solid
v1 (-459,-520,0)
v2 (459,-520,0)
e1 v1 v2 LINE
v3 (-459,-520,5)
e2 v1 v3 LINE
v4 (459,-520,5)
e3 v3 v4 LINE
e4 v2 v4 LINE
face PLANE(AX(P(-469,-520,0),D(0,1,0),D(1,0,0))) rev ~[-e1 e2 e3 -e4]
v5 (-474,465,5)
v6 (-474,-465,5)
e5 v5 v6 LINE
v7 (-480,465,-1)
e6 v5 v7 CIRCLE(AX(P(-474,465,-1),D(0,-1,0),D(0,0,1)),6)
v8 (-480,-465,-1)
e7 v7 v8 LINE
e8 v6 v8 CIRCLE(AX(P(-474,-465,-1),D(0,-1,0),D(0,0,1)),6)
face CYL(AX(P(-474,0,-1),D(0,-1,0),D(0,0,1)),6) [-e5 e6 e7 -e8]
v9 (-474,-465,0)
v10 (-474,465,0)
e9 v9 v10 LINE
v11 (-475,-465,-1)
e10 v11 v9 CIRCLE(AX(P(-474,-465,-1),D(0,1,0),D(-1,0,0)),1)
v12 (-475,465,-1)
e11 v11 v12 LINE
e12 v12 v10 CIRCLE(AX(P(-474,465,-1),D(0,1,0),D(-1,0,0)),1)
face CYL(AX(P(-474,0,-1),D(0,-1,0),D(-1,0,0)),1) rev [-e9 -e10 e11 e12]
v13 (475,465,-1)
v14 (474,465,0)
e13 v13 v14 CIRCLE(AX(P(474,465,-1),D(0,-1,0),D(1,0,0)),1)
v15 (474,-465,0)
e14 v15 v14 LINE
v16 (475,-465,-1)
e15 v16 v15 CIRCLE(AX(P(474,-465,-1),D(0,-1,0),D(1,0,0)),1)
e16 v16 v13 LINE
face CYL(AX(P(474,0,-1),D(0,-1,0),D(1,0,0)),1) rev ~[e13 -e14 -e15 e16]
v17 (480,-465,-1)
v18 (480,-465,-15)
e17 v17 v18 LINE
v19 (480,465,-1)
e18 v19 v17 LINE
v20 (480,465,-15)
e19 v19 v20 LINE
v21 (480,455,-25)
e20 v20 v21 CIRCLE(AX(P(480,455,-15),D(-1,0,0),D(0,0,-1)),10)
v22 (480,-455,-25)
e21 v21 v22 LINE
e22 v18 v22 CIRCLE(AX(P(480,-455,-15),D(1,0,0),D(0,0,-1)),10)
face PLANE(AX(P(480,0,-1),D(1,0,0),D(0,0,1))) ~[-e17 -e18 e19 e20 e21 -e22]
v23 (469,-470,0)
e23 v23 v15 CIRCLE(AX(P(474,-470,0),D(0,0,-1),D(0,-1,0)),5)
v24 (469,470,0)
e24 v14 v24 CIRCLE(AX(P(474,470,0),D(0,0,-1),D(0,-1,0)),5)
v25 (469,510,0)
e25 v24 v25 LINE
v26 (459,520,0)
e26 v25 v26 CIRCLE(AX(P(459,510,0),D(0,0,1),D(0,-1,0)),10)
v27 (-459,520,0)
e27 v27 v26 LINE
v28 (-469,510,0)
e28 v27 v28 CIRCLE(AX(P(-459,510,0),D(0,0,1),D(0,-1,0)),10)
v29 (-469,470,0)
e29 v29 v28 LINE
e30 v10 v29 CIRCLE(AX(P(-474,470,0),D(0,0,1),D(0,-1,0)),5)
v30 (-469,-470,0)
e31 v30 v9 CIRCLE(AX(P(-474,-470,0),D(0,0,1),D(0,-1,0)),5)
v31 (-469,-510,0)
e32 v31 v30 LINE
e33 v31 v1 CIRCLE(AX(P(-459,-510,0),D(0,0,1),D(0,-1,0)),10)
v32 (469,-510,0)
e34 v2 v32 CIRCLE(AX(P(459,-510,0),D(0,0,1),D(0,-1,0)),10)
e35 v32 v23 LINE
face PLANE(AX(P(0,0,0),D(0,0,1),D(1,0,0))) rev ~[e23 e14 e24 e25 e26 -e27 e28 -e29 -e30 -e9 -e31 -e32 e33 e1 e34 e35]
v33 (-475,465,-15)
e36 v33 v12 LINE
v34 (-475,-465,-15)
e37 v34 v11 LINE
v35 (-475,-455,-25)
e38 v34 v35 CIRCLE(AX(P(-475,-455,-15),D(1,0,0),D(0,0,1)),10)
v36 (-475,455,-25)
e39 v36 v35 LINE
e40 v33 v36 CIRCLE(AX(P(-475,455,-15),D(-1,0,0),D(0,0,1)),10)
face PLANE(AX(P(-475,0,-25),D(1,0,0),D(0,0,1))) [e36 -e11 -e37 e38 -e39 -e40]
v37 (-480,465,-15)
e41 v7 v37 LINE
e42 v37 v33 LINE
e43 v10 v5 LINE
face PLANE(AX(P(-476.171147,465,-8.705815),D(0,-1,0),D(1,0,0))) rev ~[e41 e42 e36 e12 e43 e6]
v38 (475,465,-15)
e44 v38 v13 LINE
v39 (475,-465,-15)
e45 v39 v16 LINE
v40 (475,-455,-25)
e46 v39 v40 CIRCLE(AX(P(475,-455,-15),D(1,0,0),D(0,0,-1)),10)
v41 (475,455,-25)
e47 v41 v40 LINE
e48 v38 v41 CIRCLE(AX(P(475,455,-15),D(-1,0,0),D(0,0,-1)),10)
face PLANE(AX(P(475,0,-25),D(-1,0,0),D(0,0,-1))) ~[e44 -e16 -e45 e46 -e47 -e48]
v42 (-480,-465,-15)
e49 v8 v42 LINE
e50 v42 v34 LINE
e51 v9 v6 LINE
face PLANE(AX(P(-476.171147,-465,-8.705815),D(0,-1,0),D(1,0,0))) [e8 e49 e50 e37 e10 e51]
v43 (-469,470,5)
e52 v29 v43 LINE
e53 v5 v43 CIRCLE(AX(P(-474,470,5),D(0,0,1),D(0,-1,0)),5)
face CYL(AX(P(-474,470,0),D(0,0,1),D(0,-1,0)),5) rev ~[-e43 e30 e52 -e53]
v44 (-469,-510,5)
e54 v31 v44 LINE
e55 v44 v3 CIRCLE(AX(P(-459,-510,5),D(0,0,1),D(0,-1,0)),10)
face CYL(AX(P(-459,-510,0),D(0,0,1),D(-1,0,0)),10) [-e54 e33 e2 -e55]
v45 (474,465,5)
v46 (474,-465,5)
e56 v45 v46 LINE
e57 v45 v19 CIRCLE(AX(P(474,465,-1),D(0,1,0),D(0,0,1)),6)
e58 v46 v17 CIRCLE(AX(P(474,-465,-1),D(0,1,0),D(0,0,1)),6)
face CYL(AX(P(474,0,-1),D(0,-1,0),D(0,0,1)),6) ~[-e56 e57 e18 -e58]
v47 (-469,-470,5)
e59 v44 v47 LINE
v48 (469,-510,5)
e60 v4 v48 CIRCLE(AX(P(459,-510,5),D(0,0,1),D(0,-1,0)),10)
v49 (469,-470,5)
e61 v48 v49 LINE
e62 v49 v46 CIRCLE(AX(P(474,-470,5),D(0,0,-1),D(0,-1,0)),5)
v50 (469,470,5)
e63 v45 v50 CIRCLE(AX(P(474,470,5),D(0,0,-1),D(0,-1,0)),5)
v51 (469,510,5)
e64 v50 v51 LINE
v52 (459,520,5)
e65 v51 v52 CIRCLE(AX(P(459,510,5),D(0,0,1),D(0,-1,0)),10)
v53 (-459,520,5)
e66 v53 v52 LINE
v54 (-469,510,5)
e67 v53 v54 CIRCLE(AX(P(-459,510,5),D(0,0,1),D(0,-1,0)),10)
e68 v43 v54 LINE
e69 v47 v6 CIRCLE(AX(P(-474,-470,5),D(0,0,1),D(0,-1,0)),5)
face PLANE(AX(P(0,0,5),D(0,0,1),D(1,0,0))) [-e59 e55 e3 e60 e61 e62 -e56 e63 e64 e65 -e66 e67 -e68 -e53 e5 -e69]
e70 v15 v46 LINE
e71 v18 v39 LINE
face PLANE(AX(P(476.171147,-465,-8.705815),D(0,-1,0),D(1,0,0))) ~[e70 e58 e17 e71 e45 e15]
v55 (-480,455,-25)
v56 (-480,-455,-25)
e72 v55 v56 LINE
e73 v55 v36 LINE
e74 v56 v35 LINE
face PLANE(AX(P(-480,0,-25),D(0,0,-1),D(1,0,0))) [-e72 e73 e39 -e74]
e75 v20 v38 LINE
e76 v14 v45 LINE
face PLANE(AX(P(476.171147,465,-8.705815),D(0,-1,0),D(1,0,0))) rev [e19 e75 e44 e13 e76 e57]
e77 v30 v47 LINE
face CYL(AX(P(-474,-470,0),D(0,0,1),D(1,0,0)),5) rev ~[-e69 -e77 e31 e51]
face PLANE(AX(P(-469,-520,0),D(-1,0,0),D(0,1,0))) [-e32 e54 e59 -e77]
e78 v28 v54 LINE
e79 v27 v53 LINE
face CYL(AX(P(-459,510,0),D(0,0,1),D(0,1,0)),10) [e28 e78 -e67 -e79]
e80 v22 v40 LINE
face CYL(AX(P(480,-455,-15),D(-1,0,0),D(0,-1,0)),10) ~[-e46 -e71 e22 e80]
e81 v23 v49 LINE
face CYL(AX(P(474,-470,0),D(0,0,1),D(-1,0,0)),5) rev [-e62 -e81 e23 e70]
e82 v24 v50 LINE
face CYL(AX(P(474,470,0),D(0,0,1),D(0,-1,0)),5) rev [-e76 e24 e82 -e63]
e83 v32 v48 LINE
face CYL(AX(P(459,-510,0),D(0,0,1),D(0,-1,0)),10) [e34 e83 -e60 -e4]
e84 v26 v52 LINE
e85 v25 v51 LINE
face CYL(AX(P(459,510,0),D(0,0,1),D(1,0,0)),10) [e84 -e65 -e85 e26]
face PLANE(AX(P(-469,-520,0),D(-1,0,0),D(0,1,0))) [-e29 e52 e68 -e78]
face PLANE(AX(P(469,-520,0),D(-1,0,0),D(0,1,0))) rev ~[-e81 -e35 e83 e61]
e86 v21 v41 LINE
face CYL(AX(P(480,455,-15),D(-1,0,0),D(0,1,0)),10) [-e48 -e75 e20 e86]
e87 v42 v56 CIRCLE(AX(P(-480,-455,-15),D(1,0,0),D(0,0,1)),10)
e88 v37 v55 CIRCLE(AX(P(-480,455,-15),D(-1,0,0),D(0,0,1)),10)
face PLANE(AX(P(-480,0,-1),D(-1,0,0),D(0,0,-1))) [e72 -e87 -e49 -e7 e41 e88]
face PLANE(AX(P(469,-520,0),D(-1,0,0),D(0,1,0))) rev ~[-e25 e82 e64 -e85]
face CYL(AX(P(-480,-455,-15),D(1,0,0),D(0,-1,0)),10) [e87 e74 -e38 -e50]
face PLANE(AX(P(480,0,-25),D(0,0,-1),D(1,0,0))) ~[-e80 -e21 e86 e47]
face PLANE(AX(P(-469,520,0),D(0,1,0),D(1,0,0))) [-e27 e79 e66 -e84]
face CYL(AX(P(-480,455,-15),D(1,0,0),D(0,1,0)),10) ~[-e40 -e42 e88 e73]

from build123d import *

# Parameters (mm, degrees)
F0_W     = 938
F0_H     = 1040
F1_DEPTH = 5
F3_DEPTH = 465
F4_R     = 10
F5_R     = 5


# Not quite as in the source:
# - a pattern or mirror of a feature is missing from the dataset's text; its kind, count and spacing are read off the source's solid


with BuildPart() as f1:
    # F0 (on Top) → F1 (new body)
    with BuildSketch(Plane.XY):
        Rectangle(F0_W, F0_H)
    extrude(amount=F1_DEPTH)

    # F2 (on Front) → F3 (join, symmetric)
    with BuildSketch(Plane.XZ):
        with BuildLine():
            Line((-469, 0), (-469, 5))
            Line((-469, 5), (-474, 5))
            ThreePointArc((-474, 5), (-478.2426406871, 3.2426406871), (-480, -1))
            Line((-480, -1), (-480, -25))
            Line((-480, -25), (-475, -25))
            Line((-475, -25), (-475, -1))
            ThreePointArc((-475, -1), (-474.7071067812, -0.2928932188), (-474, 0))
            Line((-474, 0), (-469, 0))
        make_face()
    f3 = extrude(amount=F3_DEPTH, both=True)

    # F3_copies: F3 across plane
    add(f3.mirror(Plane(origin=(0, 0, 0), x_dir=(0, 0, 1), z_dir=(1, 0, 0))))

    # F4
    f4_edges = [f1.edges().sort_by_distance(p)[0] for p in [
        (-469, -520, 2.5),
        (-477.5, -465, -25),
        (-477.5, 465, -25),
        (-469, 520, 2.5),
        (469, 520, 2.5),
        (469, -520, 2.5),
        (477.5, -465, -25),
        (477.5, 465, -25),
    ]]
    fillet(f4_edges, radius=F4_R)

    # F5
    f5_edges = [f1.edges().sort_by_distance(p)[0] for p in [
        (-469, -465, 2.5),
        (-469, 465, 2.5),
        (469, -465, 2.5),
        (469, 465, 2.5),
    ]]
    fillet(f5_edges, radius=F5_R)


solid = f1.part
